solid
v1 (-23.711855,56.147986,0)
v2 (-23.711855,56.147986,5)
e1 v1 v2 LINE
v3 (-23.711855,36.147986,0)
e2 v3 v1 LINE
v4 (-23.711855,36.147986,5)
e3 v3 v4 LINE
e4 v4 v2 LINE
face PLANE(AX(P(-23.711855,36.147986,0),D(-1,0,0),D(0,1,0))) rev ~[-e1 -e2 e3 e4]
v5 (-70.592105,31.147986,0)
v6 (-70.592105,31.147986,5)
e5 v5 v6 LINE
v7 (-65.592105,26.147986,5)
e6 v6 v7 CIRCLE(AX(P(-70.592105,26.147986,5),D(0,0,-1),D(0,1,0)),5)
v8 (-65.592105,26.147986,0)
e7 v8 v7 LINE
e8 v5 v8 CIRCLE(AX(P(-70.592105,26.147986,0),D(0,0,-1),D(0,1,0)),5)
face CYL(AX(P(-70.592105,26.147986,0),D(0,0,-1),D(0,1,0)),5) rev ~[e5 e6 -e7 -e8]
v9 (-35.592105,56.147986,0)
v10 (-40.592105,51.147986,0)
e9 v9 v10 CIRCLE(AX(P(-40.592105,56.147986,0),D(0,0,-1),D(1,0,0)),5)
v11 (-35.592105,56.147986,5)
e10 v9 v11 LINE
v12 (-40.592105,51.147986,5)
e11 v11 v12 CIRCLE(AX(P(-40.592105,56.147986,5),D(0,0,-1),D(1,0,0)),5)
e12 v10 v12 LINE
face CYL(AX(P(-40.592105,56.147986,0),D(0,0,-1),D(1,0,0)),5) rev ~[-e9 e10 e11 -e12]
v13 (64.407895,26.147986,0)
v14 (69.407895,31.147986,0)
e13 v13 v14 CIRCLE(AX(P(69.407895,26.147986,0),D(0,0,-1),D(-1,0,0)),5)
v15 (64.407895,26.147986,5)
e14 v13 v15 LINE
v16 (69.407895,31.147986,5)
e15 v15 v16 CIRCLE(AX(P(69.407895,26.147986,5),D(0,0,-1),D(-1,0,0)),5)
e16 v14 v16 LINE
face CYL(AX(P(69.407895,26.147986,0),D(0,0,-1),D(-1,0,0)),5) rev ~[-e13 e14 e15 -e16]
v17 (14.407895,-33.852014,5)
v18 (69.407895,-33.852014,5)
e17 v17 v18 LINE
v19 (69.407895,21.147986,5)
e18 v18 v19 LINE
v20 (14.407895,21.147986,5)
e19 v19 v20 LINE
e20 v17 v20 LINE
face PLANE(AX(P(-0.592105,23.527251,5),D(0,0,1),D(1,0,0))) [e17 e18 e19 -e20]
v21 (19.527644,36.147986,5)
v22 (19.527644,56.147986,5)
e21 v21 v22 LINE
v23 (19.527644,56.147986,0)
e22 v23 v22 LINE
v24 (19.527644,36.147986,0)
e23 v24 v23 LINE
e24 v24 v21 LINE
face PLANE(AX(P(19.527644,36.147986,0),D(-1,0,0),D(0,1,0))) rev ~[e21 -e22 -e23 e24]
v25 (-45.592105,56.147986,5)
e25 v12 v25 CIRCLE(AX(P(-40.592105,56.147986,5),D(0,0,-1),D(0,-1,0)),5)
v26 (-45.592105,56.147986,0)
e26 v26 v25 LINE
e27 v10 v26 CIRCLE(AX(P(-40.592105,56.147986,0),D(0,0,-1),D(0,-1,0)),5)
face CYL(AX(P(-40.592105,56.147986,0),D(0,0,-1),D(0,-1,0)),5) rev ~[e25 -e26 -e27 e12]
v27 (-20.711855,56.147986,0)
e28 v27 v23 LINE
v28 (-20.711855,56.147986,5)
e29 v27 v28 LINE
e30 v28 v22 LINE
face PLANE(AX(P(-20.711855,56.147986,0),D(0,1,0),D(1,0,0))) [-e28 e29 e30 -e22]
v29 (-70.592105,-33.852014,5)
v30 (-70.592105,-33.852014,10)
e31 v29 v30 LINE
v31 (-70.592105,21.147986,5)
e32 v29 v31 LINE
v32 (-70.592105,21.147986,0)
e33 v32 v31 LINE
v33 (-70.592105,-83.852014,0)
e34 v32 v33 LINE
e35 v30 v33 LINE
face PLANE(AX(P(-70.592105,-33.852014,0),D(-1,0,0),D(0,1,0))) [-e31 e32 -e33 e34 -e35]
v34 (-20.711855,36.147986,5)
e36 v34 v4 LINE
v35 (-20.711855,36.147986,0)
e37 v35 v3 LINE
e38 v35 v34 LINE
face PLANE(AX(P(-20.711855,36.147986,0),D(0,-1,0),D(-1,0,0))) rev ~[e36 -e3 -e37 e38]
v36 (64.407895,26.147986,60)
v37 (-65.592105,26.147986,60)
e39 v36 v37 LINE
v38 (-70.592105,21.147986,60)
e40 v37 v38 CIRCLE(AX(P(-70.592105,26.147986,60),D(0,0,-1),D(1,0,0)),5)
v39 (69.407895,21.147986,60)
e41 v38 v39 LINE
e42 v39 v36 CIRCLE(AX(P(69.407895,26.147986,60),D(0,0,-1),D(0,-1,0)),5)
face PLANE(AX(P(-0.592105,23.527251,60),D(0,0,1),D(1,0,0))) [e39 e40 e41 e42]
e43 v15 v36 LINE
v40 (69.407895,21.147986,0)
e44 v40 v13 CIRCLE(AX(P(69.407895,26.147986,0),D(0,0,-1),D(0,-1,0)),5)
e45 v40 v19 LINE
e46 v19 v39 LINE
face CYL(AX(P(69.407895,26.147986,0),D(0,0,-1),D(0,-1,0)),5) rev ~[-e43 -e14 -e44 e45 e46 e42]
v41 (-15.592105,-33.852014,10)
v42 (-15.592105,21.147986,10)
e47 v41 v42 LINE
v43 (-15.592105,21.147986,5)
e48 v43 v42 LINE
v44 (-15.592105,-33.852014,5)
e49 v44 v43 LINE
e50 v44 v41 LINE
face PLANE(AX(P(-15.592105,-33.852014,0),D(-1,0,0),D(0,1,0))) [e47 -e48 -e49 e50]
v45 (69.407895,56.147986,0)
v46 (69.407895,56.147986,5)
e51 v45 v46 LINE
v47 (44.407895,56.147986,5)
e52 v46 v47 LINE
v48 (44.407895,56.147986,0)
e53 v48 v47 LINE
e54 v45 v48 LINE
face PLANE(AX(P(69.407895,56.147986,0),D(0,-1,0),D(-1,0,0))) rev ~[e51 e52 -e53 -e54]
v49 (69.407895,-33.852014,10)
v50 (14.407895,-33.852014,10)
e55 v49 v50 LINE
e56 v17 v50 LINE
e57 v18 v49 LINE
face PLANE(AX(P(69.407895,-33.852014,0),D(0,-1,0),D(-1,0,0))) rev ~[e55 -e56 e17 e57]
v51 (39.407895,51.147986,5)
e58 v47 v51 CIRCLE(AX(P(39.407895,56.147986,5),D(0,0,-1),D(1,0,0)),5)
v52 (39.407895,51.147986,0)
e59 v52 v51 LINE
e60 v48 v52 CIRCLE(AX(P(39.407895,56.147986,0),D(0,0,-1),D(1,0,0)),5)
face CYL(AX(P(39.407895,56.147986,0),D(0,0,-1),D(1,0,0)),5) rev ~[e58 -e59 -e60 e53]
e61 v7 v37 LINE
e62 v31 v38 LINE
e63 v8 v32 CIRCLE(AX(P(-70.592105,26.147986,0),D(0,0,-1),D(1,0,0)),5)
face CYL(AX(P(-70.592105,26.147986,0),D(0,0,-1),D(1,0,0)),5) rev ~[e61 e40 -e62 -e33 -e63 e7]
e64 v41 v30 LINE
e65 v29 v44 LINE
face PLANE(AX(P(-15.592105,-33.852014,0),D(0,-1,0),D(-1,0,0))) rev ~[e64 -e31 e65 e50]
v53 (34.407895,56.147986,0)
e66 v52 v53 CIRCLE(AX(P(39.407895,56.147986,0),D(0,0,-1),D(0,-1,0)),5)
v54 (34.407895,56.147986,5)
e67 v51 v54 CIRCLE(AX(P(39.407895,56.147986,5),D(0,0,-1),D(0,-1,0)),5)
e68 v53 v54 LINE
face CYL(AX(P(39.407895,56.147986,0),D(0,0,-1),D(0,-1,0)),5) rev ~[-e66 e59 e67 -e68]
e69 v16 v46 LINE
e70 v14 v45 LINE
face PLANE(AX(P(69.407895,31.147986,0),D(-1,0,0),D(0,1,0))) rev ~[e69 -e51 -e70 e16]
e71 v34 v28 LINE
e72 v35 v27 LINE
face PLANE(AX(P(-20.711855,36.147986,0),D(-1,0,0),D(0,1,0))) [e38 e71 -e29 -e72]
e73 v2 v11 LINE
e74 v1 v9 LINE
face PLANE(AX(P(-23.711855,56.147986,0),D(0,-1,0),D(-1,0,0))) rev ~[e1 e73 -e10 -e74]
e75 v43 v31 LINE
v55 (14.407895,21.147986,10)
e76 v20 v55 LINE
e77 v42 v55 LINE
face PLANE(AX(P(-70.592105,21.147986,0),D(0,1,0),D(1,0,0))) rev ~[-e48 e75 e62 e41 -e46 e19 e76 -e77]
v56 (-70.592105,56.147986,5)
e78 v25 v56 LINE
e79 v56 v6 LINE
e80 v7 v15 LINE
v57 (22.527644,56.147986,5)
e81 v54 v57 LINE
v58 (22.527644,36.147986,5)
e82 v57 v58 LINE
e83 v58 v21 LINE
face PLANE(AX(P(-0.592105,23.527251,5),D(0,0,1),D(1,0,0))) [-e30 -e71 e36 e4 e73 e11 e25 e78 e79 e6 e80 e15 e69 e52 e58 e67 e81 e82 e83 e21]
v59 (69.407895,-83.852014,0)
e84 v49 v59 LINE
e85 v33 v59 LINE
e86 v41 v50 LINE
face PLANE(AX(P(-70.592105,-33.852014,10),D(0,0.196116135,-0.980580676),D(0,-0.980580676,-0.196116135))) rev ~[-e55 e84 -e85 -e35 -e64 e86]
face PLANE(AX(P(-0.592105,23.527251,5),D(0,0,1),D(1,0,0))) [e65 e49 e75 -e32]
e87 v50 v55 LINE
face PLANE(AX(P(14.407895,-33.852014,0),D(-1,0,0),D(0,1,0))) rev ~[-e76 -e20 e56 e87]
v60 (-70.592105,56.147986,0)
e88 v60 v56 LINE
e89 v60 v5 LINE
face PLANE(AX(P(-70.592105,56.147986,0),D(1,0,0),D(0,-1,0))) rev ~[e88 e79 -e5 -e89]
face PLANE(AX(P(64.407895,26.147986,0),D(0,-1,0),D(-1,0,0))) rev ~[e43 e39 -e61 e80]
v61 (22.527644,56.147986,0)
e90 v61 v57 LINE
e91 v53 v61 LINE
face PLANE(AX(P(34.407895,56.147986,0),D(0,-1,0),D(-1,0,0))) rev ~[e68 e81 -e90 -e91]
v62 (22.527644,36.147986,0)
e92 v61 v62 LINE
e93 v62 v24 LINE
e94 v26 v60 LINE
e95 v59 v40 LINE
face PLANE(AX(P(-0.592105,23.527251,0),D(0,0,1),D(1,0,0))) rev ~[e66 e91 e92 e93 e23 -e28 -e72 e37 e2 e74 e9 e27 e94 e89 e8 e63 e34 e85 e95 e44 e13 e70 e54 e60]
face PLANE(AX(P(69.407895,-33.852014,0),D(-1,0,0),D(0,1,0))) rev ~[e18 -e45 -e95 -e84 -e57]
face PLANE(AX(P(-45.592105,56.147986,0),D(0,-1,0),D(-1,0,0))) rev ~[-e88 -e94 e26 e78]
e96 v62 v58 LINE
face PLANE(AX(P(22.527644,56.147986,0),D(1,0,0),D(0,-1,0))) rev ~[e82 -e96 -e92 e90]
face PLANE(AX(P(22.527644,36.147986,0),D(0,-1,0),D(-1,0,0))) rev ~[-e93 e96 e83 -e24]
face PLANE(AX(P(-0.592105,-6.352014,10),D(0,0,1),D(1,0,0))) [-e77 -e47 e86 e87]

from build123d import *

# Parameters (mm, degrees)
F0_W     = 40.2394990027
F0_H     = 20
F0_W_2   = 55
F0_H_2   = 55
F1_DEPTH = 5
F0_W_3   = 30
F2_DEPTH = 10
F4_DEPTH = 141
F5_DEPTH = 60


# Not quite as in the source:
# - a feature names something its author has since deleted; it is built from what else it names


with BuildPart() as f1:
    # F0 (on Top) → F1 (new body)
    with BuildSketch(Plane.XY):
        with BuildLine():
            Line((-40.5921050906, 26.1479860185), (-65.5921050906, 26.1479860185))
            ThreePointArc((-65.5921050906, 26.1479860185), (-67.0565711847, 22.6124521126), (-70.5921050906, 21.1479860185))
            Line((-70.5921050906, 21.1479860185), (-15.5921050906, 21.1479860185))
            Line((-15.5921050906, 21.1479860185), (14.4078949094, 21.1479860185))
            Line((14.4078949094, 21.1479860185), (69.4078949094, 21.1479860185))
            ThreePointArc((69.4078949094, 21.1479860185), (65.8723610034, 22.6124521126), (64.4078949094, 26.1479860185))
            Line((64.4078949094, 26.1479860185), (39.4078949094, 26.1479860185))
            Line((39.4078949094, 26.1479860185), (-40.5921050906, 26.1479860185))
        make_face()
        with BuildLine():
            Line((-45.5921050906, 56.1479860185), (-70.5921050906, 56.1479860185))
            Line((-70.5921050906, 56.1479860185), (-70.5921050906, 31.1479860185))
            ThreePointArc((-70.5921050906, 31.1479860185), (-67.0565711847, 29.6835199245), (-65.5921050906, 26.1479860185))
            Line((-65.5921050906, 26.1479860185), (-40.5921050906, 26.1479860185))
            Line((-40.5921050906, 26.1479860185), (-40.5921050906, 51.1479860185))
            ThreePointArc((-40.5921050906, 51.1479860185), (-44.1276389966, 52.6124521126), (-45.5921050906, 56.1479860185))
        make_face()
        with Locations((-0.5921050906, 46.1479860185)):
            Rectangle(F0_W, F0_H)
        with BuildLine():
            Line((39.4078949094, 51.1479860185), (39.4078949094, 26.1479860185))
            Line((39.4078949094, 26.1479860185), (64.4078949094, 26.1479860185))
            ThreePointArc((64.4078949094, 26.1479860185), (65.8723610034, 29.6835199245), (69.4078949094, 31.1479860185))
            Line((69.4078949094, 31.1479860185), (69.4078949094, 56.1479860185))
            Line((69.4078949094, 56.1479860185), (44.4078949094, 56.1479860185))
            ThreePointArc((44.4078949094, 56.1479860185), (42.9434288153, 52.6124521126), (39.4078949094, 51.1479860185))
        make_face()
        with BuildLine():
            ThreePointArc((-35.5921050906, 56.1479860185), (-37.0565711847, 52.6124521126), (-40.5921050906, 51.1479860185))
            Line((-40.5921050906, 51.1479860185), (-40.5921050906, 26.1479860185))
            Line((-40.5921050906, 26.1479860185), (39.4078949094, 26.1479860185))
            Line((39.4078949094, 26.1479860185), (39.4078949094, 51.1479860185))
            ThreePointArc((39.4078949094, 51.1479860185), (35.8723610034, 52.6124521126), (34.4078949094, 56.1479860185))
            Line((34.4078949094, 56.1479860185), (22.5276444107, 56.1479860185))
            Line((22.5276444107, 56.1479860185), (22.5276444107, 36.1479860185))
            Line((22.5276444107, 36.1479860185), (19.5276444107, 36.1479860185))
            Line((19.5276444107, 36.1479860185), (-20.711854592, 36.1479860185))
            Line((-20.711854592, 36.1479860185), (-23.711854592, 36.1479860185))
            Line((-23.711854592, 36.1479860185), (-23.711854592, 56.1479860185))
            Line((-23.711854592, 56.1479860185), (-35.5921050906, 56.1479860185))
        make_face()
        with Locations((-43.0921050906, -6.3520139815)):
            Rectangle(F0_W_2, F0_H_2)
        with Locations((41.9078949094, -6.3520139815)):
            Rectangle(F0_W_2, F0_H_2)
    extrude(amount=F1_DEPTH)

    # F0 (on Top) → F2 (join)
    with BuildSketch(Plane.XY):
        with Locations((-0.5921050906, -6.3520139815)):
            Rectangle(F0_W_3, F0_H_2)
        Polygon((-15.5921050906, -33.8520139815), (-70.5921050906, -33.8520139815), (-70.5921050906, -83.8520139815), (69.4078949094, -83.8520139815), (69.4078949094, -33.8520139815), (14.4078949094, -33.8520139815), align=None)
    extrude(amount=F2_DEPTH)

    # F3 (on face) → F4 (cut)
    with BuildSketch(Plane(origin=(-70.5921050906, 0, 0), x_dir=(0, -1, 0), z_dir=(-1, 0, 0))):
        Polygon((83.8520139815, 10), (33.8520139815, 10), (83.8520139815, 0), align=None)
    extrude(amount=-F4_DEPTH, mode=Mode.SUBTRACT)

    # F0 (on Top) → F5 (join)
    with BuildSketch(Plane.XY):
        with BuildLine():
            Line((-40.5921050906, 26.1479860185), (-65.5921050906, 26.1479860185))
            ThreePointArc((-65.5921050906, 26.1479860185), (-67.0565711847, 22.6124521126), (-70.5921050906, 21.1479860185))
            Line((-70.5921050906, 21.1479860185), (-15.5921050906, 21.1479860185))
            Line((-15.5921050906, 21.1479860185), (14.4078949094, 21.1479860185))
            Line((14.4078949094, 21.1479860185), (69.4078949094, 21.1479860185))
            ThreePointArc((69.4078949094, 21.1479860185), (65.8723610034, 22.6124521126), (64.4078949094, 26.1479860185))
            Line((64.4078949094, 26.1479860185), (39.4078949094, 26.1479860185))
            Line((39.4078949094, 26.1479860185), (-40.5921050906, 26.1479860185))
        make_face()
    extrude(amount=F5_DEPTH)


solid = f1.part
